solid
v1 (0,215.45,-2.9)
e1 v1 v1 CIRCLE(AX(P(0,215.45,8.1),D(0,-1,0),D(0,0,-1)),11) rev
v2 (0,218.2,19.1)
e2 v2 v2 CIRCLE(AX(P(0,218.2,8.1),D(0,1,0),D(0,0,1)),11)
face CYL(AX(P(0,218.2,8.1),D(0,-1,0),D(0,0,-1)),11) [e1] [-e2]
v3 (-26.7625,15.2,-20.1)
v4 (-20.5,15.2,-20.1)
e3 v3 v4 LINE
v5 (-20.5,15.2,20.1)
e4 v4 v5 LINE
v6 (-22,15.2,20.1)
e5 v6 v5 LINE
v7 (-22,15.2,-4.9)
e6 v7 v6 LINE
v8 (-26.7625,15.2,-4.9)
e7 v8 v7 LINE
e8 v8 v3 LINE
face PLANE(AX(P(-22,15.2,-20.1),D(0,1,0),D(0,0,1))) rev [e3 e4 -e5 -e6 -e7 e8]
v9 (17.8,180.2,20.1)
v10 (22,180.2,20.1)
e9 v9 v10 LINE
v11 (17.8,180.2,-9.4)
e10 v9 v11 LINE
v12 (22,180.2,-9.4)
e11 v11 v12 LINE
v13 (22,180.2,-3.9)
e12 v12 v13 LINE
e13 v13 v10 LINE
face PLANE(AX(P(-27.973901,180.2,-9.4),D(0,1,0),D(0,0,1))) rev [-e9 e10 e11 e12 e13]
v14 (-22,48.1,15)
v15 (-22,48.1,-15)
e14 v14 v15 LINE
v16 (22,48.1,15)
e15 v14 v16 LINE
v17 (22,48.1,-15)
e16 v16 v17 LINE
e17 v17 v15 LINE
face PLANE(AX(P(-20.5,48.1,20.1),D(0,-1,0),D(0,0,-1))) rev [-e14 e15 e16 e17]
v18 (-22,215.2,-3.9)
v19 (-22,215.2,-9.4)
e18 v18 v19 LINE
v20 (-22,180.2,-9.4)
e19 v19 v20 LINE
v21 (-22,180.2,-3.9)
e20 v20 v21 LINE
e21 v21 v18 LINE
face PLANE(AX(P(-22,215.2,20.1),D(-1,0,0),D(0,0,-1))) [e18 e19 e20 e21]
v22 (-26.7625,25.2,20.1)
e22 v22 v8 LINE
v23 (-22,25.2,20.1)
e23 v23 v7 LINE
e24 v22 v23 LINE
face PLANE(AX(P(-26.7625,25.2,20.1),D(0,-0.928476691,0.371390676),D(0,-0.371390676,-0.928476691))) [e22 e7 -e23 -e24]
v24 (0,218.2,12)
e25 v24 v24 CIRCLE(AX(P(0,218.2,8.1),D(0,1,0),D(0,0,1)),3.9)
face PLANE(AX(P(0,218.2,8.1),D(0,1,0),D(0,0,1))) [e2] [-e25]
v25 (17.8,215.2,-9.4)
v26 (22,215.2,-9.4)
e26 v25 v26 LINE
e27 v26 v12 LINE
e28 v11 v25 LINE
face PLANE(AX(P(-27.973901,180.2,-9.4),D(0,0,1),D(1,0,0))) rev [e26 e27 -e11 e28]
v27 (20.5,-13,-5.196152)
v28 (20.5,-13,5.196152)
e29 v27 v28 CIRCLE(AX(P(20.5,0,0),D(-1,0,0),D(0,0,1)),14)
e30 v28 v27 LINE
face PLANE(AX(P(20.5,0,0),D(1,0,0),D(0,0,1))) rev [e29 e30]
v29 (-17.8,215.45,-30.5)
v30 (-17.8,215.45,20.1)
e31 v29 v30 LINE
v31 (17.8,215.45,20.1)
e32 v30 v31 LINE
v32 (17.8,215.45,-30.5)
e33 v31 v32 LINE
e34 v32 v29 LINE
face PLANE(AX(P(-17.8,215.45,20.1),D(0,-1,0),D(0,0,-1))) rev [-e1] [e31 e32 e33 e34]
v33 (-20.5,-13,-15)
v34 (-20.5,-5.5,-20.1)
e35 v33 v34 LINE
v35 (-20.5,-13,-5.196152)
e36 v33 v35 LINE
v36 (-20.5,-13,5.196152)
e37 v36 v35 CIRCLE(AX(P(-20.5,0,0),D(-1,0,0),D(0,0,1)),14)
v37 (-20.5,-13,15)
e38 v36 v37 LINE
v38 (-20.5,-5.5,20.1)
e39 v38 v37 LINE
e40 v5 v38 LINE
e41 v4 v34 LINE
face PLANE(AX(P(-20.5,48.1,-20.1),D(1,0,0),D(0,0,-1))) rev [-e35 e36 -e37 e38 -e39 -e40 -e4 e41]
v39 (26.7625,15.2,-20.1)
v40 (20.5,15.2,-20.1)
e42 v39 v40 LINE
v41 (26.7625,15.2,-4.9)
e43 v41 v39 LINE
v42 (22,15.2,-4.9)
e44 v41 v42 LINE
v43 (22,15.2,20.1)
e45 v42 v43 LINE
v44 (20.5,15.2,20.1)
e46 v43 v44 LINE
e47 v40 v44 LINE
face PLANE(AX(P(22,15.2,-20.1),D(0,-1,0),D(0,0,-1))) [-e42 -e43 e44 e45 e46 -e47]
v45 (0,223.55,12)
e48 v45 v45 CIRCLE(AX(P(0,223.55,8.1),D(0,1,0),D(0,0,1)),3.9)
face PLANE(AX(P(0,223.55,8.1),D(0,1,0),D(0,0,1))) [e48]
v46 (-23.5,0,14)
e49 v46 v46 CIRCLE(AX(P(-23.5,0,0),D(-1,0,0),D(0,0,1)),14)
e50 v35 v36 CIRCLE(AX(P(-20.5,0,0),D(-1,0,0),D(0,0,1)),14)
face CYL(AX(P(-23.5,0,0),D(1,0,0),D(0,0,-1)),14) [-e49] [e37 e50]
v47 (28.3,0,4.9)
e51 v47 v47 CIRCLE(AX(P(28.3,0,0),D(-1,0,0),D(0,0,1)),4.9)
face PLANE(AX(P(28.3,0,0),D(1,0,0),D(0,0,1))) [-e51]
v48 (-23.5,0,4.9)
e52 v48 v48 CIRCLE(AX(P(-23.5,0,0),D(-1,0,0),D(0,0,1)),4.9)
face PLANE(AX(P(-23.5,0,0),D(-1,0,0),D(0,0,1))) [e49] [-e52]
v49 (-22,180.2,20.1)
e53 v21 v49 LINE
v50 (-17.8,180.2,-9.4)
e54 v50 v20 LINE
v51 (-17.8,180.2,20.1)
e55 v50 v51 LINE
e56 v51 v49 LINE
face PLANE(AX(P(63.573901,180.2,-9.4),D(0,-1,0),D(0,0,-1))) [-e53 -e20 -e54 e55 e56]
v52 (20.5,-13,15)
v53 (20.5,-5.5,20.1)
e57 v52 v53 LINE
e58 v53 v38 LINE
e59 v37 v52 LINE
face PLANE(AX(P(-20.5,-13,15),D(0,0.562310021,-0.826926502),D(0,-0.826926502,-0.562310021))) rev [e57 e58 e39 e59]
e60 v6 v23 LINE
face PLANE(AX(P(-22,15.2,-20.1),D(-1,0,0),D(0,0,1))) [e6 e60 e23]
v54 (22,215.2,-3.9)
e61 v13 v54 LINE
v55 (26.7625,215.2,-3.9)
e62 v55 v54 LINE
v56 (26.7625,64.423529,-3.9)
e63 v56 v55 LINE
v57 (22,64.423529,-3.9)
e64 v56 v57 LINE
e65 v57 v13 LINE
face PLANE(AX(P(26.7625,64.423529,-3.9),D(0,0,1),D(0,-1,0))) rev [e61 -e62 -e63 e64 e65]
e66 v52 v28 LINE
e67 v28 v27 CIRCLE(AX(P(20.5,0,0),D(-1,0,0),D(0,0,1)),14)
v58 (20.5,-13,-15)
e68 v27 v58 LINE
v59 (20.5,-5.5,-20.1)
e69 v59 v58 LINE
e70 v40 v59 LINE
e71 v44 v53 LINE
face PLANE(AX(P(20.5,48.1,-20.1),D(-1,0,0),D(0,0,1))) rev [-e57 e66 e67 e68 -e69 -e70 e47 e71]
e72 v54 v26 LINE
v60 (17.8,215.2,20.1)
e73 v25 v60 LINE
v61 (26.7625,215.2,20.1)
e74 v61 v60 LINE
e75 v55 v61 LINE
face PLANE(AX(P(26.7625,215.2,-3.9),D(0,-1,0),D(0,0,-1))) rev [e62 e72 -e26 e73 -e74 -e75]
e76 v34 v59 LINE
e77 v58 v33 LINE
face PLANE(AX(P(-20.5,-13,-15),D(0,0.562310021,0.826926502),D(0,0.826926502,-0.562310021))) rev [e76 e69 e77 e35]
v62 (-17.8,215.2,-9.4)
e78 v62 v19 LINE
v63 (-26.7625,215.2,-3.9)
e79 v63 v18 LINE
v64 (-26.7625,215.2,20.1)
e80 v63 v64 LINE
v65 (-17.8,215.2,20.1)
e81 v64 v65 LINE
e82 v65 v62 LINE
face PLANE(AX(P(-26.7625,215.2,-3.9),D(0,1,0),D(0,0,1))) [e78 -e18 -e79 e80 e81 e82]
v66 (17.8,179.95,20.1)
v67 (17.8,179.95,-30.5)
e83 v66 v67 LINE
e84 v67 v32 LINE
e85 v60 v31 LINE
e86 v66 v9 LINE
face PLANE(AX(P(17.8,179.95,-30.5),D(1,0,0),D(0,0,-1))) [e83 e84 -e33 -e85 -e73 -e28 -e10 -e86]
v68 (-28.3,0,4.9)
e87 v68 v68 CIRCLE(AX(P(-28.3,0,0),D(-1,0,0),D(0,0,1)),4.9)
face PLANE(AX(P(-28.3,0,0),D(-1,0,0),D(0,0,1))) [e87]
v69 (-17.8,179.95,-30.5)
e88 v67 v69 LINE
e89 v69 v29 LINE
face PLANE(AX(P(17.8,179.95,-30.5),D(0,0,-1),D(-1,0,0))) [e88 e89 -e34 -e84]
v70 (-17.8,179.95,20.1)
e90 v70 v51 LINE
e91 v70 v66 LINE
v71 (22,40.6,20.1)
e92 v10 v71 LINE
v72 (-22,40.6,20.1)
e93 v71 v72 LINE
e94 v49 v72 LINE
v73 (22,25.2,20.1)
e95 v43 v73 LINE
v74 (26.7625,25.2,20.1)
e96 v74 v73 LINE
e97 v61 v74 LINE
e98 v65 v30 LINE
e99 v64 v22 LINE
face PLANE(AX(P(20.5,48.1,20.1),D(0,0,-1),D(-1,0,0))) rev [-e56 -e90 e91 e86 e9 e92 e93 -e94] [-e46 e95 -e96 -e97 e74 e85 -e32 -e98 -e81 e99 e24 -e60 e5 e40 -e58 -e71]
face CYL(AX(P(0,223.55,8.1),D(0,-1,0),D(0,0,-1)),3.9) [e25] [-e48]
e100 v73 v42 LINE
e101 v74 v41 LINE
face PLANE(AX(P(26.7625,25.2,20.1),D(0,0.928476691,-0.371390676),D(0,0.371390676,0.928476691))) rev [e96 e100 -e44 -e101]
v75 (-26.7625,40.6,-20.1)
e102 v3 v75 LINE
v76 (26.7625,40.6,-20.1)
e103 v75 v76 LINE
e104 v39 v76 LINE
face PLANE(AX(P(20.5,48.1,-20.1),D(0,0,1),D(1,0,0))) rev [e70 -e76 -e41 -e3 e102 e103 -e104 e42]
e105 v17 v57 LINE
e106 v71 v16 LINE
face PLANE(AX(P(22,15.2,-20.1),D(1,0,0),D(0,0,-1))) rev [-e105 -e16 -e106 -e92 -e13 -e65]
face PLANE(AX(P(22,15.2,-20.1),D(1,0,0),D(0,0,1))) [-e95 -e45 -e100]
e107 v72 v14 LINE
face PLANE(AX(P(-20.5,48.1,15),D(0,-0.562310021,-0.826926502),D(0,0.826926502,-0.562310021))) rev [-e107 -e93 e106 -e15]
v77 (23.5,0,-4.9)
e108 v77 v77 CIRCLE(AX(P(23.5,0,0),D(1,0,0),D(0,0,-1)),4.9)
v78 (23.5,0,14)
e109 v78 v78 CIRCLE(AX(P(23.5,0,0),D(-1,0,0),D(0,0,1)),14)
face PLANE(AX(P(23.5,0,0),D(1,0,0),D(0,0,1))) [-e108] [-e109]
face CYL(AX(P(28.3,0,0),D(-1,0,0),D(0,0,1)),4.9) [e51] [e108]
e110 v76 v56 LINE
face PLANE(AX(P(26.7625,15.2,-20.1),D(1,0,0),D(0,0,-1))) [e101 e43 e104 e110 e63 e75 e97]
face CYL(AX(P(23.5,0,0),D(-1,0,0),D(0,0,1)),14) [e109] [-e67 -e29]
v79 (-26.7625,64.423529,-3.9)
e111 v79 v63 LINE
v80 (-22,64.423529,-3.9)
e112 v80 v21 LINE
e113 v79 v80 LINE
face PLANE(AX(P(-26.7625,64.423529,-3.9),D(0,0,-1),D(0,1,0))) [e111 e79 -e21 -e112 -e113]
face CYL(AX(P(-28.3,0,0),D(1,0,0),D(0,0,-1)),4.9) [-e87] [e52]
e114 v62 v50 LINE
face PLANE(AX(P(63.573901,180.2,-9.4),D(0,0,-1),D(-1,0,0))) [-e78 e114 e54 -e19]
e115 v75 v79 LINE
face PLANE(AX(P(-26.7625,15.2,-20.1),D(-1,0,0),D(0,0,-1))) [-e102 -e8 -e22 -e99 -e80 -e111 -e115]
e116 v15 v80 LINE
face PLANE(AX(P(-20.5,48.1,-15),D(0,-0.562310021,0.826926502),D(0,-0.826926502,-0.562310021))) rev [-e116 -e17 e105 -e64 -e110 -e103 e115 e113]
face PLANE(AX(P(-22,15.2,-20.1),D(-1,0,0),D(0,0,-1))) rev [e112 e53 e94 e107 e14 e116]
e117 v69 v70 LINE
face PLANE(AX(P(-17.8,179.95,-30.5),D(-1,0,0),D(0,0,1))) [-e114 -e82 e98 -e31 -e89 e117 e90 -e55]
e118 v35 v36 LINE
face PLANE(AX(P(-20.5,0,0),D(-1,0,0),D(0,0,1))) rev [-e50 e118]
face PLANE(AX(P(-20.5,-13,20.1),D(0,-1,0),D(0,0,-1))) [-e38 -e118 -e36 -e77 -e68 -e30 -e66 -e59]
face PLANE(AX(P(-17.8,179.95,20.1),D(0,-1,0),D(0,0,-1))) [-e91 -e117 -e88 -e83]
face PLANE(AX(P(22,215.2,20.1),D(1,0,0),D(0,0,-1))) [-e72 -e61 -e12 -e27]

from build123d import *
from OCP.BRepFilletAPI import BRepFilletAPI_MakeChamfer

# Parameters (mm, degrees)
SKETCH1_W           = 41
SKETCH1_H           = 40.2
BOSS_EXTRUDE1_DEPTH = 61.1
SKETCH2_R           = 14
BOSS_EXTRUDE2_DEPTH = 3
SKETCH3_R           = 4.9
BOSS_EXTRUDE3_DEPTH = 4.8
CHAMFER1_SIZE       = 7.5
CHAMFER1_SIZE2      = 5.1
MIRROR5_START       = -20.5
MIRROR5_DEPTH       = 41
BOSS_EXTRUDE4_DEPTH = 1.5
BOSS_EXTRUDE5_DEPTH = 4.7625
SKETCH7_W           = 35.6
SKETCH7_H           = 50.6
BOSS_EXTRUDE6_DEPTH = 35.5
SKETCH9_W           = 29.5
SKETCH9_H           = 35
BOSS_EXTRUDE7_DEPTH = 39.8
SKETCH10_R          = 11
BOSS_EXTRUDE8_DEPTH = 2.75
SKETCH11_R          = 3.9
BOSS_EXTRUDE9_DEPTH = 5.35


# Read off the part's stored shape, not the designer's step: Mirror5
with BuildPart() as part:
    # Sketch1 → Boss-Extrude1 (new body)
    with BuildSketch(Plane(origin=(0, -13, 0), x_dir=(-1, 0, 0), z_dir=(0, 1, 0))):
        Rectangle(SKETCH1_W, SKETCH1_H)
    extrude(amount=BOSS_EXTRUDE1_DEPTH)

    # Sketch2 → Boss-Extrude2 (add)
    with BuildSketch(Plane.ZY.offset(20.5)):
        with Locations(Location((0, 0, 0), (0, 0, 248.213210702))):
            Circle(SKETCH2_R)
    boss_extrude2 = extrude(amount=BOSS_EXTRUDE2_DEPTH)

    # Sketch3 → Boss-Extrude3 (add)
    with BuildSketch(Plane.ZY.offset(23.5)):
        Circle(SKETCH3_R)
    boss_extrude3 = extrude(amount=BOSS_EXTRUDE3_DEPTH)

    # Chamfer1: one chamfer whose edges measure the first distance from different faces: ONE call of the kernel's chamfer builder (chamfer() names one face for all edges)
    chamfer1_edges_1 = [part.edges().sort_by_distance(p)[0] for p in [
        (0, 48.1, -20.1),
    ]]
    chamfer1_side_1 = [part.faces().sort_by_distance(p)[0] for p in [
        (0, 17.55, -20.1),
    ]]
    chamfer1_edges_2 = [part.edges().sort_by_distance(p)[0] for p in [
        (0, 48.1, 20.1),
    ]]
    chamfer1_side_2 = [part.faces().sort_by_distance(p)[0] for p in [
        (0, 17.55, 20.1),
    ]]
    chamfer1 = BRepFilletAPI_MakeChamfer(part.part.solid().wrapped)
    for e in chamfer1_edges_1:
        chamfer1.Add(CHAMFER1_SIZE, CHAMFER1_SIZE2, e.wrapped, chamfer1_side_1[0].wrapped)  # the first distance lies on this face
    for e in chamfer1_edges_2:
        chamfer1.Add(CHAMFER1_SIZE, CHAMFER1_SIZE2, e.wrapped, chamfer1_side_2[0].wrapped)  # the first distance lies on this face
    add(Compound.cast(chamfer1.Shape()), mode=Mode.REPLACE)

    # Mirror5 outline → Mirror5 (cut)
    with BuildSketch(Plane.YZ.offset(MIRROR5_START)):
        Polygon((-13, 20.1), (-13, 15), (-5.5, 20.1), align=None)
        Polygon((-5.5, -20.1), (-13, -15), (-13, -20.1), align=None)
    extrude(amount=MIRROR5_DEPTH, mode=Mode.SUBTRACT)

    # Sketch4 → Boss-Extrude4 (add)
    with BuildSketch(Plane.ZY.offset(20.5)):
        Polygon((-20.1, 15.2), (20.1, 15.2), (20.1, 40.6), (15, 48.1), (-15, 48.1), (-20.1, 40.6), align=None)
    boss_extrude4 = extrude(amount=BOSS_EXTRUDE4_DEPTH)

    # Mirror1: Boss-Extrude2, Boss-Extrude3, Boss-Extrude4 across plane
    add(boss_extrude2.mirror(Plane(origin=(0, 0, 0), x_dir=(0, 0, 1), z_dir=(1, 0, 0))))
    add(boss_extrude3.mirror(Plane(origin=(0, 0, 0), x_dir=(0, 0, 1), z_dir=(1, 0, 0))))
    add(boss_extrude4.mirror(Plane(origin=(0, 0, 0), x_dir=(0, 0, 1), z_dir=(1, 0, 0))))

    # Sketch6 → Boss-Extrude5 (add)
    with BuildSketch(Plane(origin=(22, 0, 0), x_dir=(0, 0, -1), z_dir=(1, 0, 0))):
        Polygon((20.1, 15.2), (20.1, 40.6), (3.9, 64.423529412), (3.9, 215.2), (-20.1, 215.2), (-20.1, 25.2), (4.9, 15.2), align=None)
    boss_extrude5 = extrude(amount=BOSS_EXTRUDE5_DEPTH)

    # Mirror2: Boss-Extrude5 across plane
    add(boss_extrude5.mirror(Plane(origin=(0, 0, 0), x_dir=(0, 0, 1), z_dir=(1, 0, 0))))



with BuildPart() as body_2:
    # Sketch7 → Boss-Extrude6 (new body)
    with BuildSketch(Plane(origin=(0, 215.45, 0), x_dir=(-1, 0, 0), z_dir=(0, 1, 0))):
        with Locations((0, -5.2)):
            Rectangle(SKETCH7_W, SKETCH7_H)
    extrude(amount=-BOSS_EXTRUDE6_DEPTH)


with BuildPart() as part_1:
    add(part.part)

    add(body_2.part)  # Boss-Extrude7 merges body 2
    # Sketch9 → Boss-Extrude7 (add)
    with BuildSketch(Plane.ZY.offset(-22)):
        with Locations((5.35, 197.7)):
            Rectangle(SKETCH9_W, SKETCH9_H)
    boss_extrude7 = extrude(amount=BOSS_EXTRUDE7_DEPTH)

    # Mirror3: Boss-Extrude7 across plane
    add(boss_extrude7.mirror(Plane(origin=(0, 0, 0), x_dir=(0, 0, 1), z_dir=(1, 0, 0))))

    # Sketch10 → Boss-Extrude8 (add)
    with BuildSketch(Plane(origin=(0, 215.45, 0), x_dir=(-1, 0, 0), z_dir=(0, 1, 0))):
        with Locations(Location((0, 8.1, 0), (0, 0, 270))):
            Circle(SKETCH10_R)
    extrude(amount=BOSS_EXTRUDE8_DEPTH)

    # Sketch11 → Boss-Extrude9 (add)
    with BuildSketch(Plane(origin=(0, 218.2, 0), x_dir=(-1, 0, 0), z_dir=(0, 1, 0))):
        with Locations(Location((0, 8.1, 0), (0, 0, 90))):
            Circle(SKETCH11_R)
    extrude(amount=BOSS_EXTRUDE9_DEPTH)


solid = part_1.part
